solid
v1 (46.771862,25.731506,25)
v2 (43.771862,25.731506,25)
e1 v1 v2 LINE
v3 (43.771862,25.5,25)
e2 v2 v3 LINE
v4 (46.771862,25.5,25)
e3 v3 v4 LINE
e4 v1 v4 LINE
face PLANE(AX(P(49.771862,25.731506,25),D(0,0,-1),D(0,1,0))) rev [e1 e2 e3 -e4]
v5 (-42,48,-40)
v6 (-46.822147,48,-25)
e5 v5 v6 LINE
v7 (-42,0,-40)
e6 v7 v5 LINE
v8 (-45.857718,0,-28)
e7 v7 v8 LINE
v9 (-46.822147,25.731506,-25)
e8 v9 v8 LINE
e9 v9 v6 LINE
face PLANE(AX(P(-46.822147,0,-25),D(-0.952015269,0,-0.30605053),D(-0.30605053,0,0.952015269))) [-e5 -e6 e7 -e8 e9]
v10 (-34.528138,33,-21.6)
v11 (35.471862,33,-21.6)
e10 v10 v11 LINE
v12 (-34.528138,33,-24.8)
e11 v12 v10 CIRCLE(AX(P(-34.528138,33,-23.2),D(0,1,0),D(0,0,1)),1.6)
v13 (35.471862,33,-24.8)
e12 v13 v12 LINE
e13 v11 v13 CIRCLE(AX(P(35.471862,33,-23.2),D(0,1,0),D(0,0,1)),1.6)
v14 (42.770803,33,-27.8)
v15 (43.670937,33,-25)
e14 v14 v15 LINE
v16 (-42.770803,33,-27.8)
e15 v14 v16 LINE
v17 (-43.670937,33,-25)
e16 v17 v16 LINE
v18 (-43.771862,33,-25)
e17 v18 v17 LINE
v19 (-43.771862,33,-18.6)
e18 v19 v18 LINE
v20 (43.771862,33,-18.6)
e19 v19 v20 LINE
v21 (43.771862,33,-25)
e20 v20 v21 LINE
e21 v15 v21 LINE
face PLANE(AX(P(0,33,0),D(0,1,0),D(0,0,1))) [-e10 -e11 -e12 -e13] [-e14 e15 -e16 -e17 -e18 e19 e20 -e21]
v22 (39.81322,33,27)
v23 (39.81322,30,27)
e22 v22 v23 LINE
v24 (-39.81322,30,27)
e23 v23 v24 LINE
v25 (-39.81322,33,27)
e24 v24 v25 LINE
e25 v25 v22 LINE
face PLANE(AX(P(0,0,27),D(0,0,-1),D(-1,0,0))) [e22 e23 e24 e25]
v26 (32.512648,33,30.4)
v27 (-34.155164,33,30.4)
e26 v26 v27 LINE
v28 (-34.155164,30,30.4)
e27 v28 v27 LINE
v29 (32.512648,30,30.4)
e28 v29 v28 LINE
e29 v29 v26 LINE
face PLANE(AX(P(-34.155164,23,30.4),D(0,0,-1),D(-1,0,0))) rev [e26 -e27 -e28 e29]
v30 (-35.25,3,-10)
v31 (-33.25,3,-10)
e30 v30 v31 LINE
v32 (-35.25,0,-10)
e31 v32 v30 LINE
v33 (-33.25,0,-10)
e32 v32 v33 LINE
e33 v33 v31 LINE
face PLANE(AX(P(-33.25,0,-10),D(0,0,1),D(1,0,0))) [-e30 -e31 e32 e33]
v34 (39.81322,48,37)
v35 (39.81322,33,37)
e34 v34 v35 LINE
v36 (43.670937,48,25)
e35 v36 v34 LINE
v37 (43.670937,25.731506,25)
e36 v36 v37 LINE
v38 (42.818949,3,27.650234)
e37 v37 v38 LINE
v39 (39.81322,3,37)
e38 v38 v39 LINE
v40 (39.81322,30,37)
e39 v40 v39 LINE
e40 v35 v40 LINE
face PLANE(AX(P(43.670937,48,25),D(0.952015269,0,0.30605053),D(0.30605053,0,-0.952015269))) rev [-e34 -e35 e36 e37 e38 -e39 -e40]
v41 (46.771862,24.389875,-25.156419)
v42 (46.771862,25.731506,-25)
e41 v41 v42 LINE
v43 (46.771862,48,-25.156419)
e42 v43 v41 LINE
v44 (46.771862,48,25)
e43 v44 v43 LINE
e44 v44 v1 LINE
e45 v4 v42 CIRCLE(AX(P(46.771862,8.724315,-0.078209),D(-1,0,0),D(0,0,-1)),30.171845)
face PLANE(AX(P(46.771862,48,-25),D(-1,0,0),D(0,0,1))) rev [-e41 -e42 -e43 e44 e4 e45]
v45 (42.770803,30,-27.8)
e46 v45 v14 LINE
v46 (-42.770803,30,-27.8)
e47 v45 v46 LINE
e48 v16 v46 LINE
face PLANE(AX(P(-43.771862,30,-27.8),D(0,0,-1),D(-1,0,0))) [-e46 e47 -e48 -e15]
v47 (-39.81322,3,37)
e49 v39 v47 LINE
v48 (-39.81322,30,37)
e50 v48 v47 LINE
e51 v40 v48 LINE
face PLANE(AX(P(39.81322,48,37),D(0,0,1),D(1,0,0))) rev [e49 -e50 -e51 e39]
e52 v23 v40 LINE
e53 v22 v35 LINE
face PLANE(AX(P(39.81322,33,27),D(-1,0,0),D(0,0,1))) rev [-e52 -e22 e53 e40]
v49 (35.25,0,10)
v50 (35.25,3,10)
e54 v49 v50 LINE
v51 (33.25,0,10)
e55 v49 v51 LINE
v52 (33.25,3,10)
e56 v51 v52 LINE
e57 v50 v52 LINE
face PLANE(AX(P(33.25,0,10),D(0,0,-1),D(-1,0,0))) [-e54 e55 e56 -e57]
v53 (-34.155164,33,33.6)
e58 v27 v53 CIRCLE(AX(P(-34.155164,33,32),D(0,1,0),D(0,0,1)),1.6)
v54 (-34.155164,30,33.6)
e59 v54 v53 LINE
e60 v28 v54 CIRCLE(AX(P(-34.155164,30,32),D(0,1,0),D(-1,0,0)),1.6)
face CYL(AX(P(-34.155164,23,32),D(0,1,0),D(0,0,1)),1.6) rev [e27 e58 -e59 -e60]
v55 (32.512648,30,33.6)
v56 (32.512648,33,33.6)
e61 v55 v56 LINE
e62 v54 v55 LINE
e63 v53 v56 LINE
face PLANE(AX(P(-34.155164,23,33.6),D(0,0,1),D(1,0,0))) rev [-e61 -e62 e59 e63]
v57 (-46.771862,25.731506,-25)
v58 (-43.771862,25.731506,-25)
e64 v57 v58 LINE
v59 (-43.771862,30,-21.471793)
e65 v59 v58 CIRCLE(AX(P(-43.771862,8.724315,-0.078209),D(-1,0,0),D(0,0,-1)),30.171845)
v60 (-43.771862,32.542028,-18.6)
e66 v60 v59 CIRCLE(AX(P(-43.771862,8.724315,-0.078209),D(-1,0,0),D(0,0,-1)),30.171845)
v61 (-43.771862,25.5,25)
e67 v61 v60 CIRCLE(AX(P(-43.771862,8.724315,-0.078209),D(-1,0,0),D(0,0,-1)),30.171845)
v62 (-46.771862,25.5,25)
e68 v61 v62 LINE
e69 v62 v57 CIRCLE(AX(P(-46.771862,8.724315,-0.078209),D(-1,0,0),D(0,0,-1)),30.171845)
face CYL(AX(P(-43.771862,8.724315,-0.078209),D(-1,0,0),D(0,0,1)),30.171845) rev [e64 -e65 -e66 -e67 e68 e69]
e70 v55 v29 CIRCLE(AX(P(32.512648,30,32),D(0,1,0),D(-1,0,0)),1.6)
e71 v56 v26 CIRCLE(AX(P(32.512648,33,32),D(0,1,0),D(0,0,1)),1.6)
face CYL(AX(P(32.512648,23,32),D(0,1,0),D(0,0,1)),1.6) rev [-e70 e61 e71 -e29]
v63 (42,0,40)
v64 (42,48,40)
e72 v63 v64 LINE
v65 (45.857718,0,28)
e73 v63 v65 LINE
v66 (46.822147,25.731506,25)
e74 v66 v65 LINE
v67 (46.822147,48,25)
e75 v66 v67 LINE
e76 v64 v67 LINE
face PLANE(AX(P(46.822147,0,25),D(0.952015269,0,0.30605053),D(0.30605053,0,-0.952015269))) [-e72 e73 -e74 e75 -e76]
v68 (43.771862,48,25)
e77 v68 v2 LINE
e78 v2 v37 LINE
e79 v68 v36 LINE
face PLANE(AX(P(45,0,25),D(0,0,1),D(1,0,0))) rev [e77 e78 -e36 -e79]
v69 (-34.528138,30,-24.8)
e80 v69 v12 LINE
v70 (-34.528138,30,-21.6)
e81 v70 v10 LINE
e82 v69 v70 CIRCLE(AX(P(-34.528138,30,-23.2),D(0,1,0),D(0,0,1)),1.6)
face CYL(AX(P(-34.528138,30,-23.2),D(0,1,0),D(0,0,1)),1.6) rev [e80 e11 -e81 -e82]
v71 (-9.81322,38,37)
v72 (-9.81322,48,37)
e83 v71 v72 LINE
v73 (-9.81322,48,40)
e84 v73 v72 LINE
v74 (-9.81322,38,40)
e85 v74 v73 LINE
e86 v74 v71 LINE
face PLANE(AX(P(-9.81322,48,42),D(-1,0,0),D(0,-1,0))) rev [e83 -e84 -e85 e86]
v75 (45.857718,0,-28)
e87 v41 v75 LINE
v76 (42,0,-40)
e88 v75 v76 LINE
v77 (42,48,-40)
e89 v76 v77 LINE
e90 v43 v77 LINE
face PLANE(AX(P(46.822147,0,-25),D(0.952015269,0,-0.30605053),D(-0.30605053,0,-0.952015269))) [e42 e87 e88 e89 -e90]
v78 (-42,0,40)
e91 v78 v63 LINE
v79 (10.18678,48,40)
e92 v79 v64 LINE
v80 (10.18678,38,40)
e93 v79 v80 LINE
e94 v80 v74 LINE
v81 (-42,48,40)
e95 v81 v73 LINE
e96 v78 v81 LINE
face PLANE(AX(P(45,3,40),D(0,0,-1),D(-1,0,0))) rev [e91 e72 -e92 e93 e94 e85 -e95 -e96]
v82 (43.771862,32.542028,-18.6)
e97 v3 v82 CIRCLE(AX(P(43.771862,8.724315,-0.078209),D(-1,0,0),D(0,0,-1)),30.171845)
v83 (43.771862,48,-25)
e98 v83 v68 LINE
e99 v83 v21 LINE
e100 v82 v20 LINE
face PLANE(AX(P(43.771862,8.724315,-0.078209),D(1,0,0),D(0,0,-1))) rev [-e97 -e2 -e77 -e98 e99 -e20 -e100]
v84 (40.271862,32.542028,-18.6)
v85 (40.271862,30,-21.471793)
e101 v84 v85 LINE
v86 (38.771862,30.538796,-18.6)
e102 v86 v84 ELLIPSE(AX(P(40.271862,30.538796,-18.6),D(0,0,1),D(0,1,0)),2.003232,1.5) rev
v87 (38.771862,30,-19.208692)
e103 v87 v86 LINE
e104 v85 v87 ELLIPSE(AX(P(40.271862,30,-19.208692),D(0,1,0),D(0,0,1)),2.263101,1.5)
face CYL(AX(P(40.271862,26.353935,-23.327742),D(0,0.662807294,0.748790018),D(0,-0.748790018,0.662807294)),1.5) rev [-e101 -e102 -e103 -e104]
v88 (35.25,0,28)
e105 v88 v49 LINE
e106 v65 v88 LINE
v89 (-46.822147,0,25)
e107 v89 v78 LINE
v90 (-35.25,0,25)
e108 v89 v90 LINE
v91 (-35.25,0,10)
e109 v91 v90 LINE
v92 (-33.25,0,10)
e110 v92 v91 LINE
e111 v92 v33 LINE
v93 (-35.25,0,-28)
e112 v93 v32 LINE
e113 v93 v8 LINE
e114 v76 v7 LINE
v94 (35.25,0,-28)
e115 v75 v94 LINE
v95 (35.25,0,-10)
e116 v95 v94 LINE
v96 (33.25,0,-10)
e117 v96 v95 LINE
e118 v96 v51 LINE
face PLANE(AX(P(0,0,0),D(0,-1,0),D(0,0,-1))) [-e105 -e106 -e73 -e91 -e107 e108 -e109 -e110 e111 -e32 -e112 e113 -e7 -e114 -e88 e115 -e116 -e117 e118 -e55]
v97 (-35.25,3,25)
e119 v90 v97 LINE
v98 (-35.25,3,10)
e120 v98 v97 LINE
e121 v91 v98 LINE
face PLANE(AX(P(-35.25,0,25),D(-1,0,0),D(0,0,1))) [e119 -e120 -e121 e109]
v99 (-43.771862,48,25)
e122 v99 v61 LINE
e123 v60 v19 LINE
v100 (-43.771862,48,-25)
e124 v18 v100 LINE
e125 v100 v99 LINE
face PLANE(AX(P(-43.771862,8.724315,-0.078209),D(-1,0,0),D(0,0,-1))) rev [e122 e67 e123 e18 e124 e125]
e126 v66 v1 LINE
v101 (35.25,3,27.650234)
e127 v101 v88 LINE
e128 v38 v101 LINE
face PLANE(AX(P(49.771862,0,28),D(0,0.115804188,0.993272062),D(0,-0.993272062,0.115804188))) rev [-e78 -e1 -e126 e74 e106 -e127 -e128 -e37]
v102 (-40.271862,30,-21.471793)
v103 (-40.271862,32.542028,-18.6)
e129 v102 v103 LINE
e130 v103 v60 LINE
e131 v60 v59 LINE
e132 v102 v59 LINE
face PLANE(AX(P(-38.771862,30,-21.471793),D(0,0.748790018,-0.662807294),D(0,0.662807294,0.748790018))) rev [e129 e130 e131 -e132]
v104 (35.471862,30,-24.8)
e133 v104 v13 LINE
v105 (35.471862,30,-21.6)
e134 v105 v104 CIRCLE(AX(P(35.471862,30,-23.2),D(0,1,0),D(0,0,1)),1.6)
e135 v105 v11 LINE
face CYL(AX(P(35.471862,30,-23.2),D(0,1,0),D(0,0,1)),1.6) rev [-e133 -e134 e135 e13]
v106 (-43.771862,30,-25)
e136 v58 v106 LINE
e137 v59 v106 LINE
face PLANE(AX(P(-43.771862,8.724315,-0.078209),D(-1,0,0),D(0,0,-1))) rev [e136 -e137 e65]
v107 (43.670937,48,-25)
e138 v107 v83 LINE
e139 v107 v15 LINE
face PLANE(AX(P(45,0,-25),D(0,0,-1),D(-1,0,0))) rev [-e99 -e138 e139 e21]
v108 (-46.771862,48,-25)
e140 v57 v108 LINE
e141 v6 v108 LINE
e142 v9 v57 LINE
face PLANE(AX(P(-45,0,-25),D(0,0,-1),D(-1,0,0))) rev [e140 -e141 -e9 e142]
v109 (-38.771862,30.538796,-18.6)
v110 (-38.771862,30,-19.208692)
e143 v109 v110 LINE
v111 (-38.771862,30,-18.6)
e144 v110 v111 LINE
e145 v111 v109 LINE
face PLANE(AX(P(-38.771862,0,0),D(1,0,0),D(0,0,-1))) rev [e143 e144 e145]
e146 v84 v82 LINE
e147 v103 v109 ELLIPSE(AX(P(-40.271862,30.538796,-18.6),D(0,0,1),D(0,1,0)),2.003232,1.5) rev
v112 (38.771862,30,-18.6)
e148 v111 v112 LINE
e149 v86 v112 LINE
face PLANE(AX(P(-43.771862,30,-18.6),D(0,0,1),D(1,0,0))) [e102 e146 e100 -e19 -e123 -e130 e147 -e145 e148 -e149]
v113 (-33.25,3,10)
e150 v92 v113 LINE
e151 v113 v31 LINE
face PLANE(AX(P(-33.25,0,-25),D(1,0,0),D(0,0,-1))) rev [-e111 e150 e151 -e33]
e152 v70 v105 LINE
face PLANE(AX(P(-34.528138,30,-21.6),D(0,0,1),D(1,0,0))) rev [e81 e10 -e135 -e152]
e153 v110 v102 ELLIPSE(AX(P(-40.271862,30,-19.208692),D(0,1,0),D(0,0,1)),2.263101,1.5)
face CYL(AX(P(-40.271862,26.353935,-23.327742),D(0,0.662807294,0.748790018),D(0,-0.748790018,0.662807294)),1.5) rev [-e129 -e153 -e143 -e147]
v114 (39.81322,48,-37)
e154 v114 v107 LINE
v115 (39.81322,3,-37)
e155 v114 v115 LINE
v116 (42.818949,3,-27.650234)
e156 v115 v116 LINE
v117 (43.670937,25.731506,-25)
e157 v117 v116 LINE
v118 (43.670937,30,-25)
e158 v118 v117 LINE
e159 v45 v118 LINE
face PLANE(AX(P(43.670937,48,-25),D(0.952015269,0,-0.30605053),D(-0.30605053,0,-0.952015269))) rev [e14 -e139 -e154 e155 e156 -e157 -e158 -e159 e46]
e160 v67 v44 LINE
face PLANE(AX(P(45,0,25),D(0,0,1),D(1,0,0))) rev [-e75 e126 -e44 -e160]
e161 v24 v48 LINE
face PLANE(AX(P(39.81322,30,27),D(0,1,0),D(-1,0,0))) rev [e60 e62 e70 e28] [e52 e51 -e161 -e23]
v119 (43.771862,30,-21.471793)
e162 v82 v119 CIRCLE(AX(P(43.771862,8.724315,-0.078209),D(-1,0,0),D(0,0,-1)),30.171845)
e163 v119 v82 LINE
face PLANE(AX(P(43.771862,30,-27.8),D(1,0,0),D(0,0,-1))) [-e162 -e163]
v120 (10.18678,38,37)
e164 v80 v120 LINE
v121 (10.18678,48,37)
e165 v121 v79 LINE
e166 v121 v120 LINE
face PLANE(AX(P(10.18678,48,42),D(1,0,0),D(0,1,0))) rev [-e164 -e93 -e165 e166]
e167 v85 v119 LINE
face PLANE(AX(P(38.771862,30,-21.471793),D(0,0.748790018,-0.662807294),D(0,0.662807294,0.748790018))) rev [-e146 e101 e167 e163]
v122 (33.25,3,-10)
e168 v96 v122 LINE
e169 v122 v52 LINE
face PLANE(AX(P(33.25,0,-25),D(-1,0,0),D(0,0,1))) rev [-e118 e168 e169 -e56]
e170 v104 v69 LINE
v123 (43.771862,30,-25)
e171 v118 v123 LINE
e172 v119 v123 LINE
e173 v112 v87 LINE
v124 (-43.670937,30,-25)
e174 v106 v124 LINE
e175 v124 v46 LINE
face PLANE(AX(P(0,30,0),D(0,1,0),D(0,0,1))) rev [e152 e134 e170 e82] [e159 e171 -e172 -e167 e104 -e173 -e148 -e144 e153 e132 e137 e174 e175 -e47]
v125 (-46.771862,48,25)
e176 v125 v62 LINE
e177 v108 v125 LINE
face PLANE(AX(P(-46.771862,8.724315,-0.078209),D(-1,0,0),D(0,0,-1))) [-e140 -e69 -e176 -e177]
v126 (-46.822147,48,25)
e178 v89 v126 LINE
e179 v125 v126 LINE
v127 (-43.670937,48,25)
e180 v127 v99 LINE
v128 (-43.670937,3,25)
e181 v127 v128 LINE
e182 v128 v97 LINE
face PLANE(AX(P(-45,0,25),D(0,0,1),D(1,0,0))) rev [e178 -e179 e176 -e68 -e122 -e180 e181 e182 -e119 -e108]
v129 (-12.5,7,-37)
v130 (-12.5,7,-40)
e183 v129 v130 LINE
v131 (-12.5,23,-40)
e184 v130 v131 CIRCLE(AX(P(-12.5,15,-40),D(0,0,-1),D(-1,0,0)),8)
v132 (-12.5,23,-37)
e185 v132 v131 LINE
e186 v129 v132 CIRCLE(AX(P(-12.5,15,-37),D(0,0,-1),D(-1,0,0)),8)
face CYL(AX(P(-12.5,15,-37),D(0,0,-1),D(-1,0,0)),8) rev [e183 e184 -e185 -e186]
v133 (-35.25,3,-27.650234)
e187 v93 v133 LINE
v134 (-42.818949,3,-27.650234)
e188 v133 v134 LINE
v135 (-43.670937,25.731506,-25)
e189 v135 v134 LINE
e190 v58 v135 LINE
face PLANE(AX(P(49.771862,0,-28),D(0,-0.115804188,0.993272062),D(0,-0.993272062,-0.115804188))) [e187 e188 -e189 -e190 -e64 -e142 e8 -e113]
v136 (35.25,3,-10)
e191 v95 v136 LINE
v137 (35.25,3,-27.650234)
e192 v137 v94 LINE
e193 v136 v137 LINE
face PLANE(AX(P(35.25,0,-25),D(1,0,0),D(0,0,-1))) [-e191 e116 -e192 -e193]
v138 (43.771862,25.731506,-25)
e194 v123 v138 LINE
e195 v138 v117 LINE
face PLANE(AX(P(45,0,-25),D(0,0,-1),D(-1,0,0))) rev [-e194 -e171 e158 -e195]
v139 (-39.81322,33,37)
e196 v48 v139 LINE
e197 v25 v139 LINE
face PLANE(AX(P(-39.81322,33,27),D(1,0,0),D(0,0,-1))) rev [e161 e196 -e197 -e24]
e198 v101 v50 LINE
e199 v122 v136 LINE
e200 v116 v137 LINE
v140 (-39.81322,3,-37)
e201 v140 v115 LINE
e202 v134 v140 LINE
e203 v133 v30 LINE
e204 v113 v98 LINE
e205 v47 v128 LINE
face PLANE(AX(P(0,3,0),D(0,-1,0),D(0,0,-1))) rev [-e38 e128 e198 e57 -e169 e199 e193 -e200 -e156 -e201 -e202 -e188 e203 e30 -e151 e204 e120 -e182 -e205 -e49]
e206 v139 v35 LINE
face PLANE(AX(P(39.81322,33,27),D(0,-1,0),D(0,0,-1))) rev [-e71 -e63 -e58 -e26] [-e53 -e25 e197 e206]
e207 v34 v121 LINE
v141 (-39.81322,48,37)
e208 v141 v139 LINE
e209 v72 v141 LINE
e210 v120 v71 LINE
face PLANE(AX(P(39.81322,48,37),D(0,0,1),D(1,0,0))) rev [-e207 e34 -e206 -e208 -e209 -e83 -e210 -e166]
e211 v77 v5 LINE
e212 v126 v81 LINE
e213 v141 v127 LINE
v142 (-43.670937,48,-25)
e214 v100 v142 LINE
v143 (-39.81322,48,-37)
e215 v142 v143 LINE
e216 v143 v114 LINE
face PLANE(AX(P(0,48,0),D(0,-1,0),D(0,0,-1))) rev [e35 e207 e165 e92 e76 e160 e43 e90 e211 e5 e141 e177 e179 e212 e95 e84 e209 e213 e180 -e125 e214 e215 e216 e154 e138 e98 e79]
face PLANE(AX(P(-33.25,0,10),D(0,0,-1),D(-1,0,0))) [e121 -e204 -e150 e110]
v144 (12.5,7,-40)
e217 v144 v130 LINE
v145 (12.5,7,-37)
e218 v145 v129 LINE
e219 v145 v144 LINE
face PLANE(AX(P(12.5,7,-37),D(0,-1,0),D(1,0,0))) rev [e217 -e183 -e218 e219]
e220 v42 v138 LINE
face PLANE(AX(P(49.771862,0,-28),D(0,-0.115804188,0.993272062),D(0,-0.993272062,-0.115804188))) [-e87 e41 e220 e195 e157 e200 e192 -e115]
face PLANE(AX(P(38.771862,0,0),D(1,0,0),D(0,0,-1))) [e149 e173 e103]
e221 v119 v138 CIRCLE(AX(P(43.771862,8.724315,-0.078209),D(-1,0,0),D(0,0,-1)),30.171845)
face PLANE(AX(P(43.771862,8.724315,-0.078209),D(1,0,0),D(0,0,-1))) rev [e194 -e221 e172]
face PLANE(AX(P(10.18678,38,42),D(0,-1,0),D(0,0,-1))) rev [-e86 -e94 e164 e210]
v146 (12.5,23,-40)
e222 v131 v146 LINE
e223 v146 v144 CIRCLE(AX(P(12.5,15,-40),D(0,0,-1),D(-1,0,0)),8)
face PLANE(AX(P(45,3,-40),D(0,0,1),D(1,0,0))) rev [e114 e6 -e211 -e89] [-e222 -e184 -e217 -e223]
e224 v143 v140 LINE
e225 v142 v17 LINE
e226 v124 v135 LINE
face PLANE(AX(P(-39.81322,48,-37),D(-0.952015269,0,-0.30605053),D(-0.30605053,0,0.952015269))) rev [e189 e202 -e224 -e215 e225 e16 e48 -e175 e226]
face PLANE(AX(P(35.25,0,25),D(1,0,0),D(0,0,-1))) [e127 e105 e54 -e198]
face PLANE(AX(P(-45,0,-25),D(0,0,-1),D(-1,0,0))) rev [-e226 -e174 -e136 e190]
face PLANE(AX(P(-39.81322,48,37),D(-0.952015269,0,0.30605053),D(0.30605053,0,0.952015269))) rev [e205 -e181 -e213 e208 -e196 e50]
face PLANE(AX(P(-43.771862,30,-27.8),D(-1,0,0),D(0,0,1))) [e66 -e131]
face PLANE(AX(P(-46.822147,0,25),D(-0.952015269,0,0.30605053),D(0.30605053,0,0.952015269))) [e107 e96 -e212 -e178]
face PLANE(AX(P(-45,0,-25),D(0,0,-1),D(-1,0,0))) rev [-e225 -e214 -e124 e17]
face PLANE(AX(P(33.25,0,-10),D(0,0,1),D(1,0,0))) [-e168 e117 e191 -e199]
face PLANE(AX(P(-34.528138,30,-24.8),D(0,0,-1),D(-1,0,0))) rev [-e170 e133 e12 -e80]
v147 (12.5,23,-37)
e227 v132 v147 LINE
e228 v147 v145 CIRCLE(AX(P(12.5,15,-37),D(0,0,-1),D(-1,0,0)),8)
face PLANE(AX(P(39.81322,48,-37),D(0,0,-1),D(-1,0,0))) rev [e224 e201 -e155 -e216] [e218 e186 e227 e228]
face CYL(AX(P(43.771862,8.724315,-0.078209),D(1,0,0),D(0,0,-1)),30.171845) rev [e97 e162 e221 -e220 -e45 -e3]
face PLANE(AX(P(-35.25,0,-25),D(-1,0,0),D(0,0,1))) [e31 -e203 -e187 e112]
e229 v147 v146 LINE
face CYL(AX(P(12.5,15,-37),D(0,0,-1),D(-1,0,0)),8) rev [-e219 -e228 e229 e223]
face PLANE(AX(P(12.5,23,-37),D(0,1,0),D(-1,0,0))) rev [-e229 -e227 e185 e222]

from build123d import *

# Parameters (mm, degrees)
SKETCH1_W            = 90
SKETCH1_H            = 80
BOSS_EXTRUDE1_DEPTH  = 3
SKETCH2_W            = 11.75
SKETCH2_H            = 50
CUT_EXTRUDE1_DEPTH   = 3
SKETCH3_W            = 2
SKETCH3_H            = 15
BOSS_EXTRUDE2_DEPTH  = 3
BOSS_EXTRUDE3_DEPTH  = 3
CUT_EXTRUDE2_DEPTH   = 3
BOSS_EXTRUDE4_DEPTH  = 45
BOSS_EXTRUDE5_DEPTH  = 3
CUT_EXTRUDE3_DEPTH   = 3
CUT_EXTRUDE6_START   = -93.59401
CUT_EXTRUDE6_DEPTH   = 93.644295
MIRROR4_START        = 35.25
MIRROR4_DEPTH        = 11.572147393
SKETCH17_W           = 70.5
SKETCH17_H           = 3
BOSS_EXTRUDE10_DEPTH = 3
SKETCH19_W           = 79.626439034
SKETCH19_H           = 3
BOSS_EXTRUDE11_DEPTH = 10
CUT_EXTRUDE7_DEPTH   = 10
SKETCH22_W           = 87.543724768
SKETCH22_H           = 9.2
BOSS_EXTRUDE12_DEPTH = 3
CUT_EXTRUDE8_DEPTH   = 5
CUT_EXTRUDE9_DEPTH   = 5
FILLET4_R            = 1.5
FILLET6_R            = 1.5
SKETCH26_W           = 20
SKETCH26_H           = 10
CUT_EXTRUDE10_DEPTH  = 5


# Read off the part's stored shape, not the designer's step: Mirror4
with BuildPart() as part:
    # Sketch1 → Boss-Extrude1 (new body)
    with BuildSketch(Plane(origin=(0, 0, 0), x_dir=(1, 0, 0), z_dir=(0, 1, 0))):
        Rectangle(SKETCH1_W, SKETCH1_H)
    extrude(amount=BOSS_EXTRUDE1_DEPTH)

    # Sketch2 → Cut-Extrude1 (cut)
    with BuildSketch(Plane(origin=(0, 3, 0), x_dir=(1, 0, 0), z_dir=(0, 1, 0))):
        with Locations((-39.125, 0)):
            Rectangle(SKETCH2_W, SKETCH2_H)
        with Locations((39.125, 0)):
            Rectangle(SKETCH2_W, SKETCH2_H)
    extrude(amount=-CUT_EXTRUDE1_DEPTH, mode=Mode.SUBTRACT)

    # Sketch3 → Boss-Extrude2 (add)
    with BuildSketch(Plane(origin=(0, 3, 0), x_dir=(1, 0, 0), z_dir=(0, 1, 0))):
        with Locations((-34.25, -17.5)):
            Rectangle(SKETCH3_W, SKETCH3_H)
        with Locations((-34.25, 17.5)):
            Rectangle(SKETCH3_W, SKETCH3_H)
        with Locations((34.25, -17.5)):
            Rectangle(SKETCH3_W, SKETCH3_H)
        with Locations((34.25, 17.5)):
            Rectangle(SKETCH3_W, SKETCH3_H)
    extrude(amount=-BOSS_EXTRUDE2_DEPTH)

    # Sketch4 → Boss-Extrude3 (add)
    with BuildSketch(Plane(origin=(0, 3, 0), x_dir=(1, 0, 0), z_dir=(0, 1, 0))):
        Polygon((-45, 25), (-46.822147393, 25), (-45, 30.668057955), align=None)
        Polygon((45, 25), (46.822147393, 25), (45, 30.668057955), align=None)
        Polygon((-45, -25), (-46.822147393, -25), (-45, -30.668057955), align=None)
        Polygon((45, -25), (46.822147393, -25), (45, -30.668057955), align=None)
    extrude(amount=-BOSS_EXTRUDE3_DEPTH)

    # Sketch5 → Cut-Extrude2 (cut)
    with BuildSketch(Plane(origin=(0, 3, 0), x_dir=(1, 0, 0), z_dir=(0, 1, 0))):
        Polygon((-45, 30.668057955), (-42, 40), (-45, 40), align=None)
        Polygon((45, 30.668057955), (42, 40), (45, 40), align=None)
        Polygon((45, -40), (45, -30.668057955), (42, -40), align=None)
        Polygon((-45, -40), (-45, -30.668057955), (-42, -40), align=None)
    extrude(amount=-CUT_EXTRUDE2_DEPTH, mode=Mode.SUBTRACT)

    # Sketch6 → Boss-Extrude4 (add)
    with BuildSketch(Plane(origin=(0, 3, 0), x_dir=(1, 0, 0), z_dir=(0, 1, 0))):
        Polygon((39.813219517, 37), (-39.813219517, 37), (-43.670937432, 25), (-46.822147393, 25), (-42, 40), (42, 40), (46.771862384, 25.156418928), (46.771862384, 25), (43.670937432, 25), align=None)
        Polygon((43.670937432, -25), (39.813219517, -37), (-39.813219517, -37), (-43.670937432, -25), (-46.822147393, -25), (-42, -40), (42, -40), (46.822147393, -25), align=None)
    extrude(amount=BOSS_EXTRUDE4_DEPTH)

    # Sketch7 → Boss-Extrude5 (add)
    with BuildSketch(Plane(origin=(46.771862384, 0, 0), x_dir=(0, 0, -1), z_dir=(1, 0, 0))):
        with BuildLine():
            Line((-25, 25.5), (-25, 48))
            Line((-25, 48), (25.156418928, 48))
            Line((25.156418928, 48), (25.156418928, 25.5))
            ThreePointArc((25.156418928, 25.5), (0.078209464, 38.896159305), (-25, 25.5))
        make_face()
    boss_extrude5 = extrude(amount=-BOSS_EXTRUDE5_DEPTH)

    # Mirror1: Boss-Extrude5 across plane
    add(boss_extrude5.mirror(Plane.ZY))

    # Sketch10 → Cut-Extrude3 (cut)
    with BuildSketch(Plane(origin=(0, 0, -40), x_dir=(-1, 0, 0), z_dir=(0, 0, -1))):
        with BuildLine():
            Line((-12.5, 23), (12.5, 23))
            ThreePointArc((12.5, 23), (20.5, 15), (12.5, 7))
            Line((12.5, 7), (-12.5, 7))
            ThreePointArc((-12.5, 7), (-20.5, 15), (-12.5, 23))
        make_face()
    extrude(amount=-CUT_EXTRUDE3_DEPTH, mode=Mode.SUBTRACT)

    # Sketch15 → Cut-Extrude6 (cut)
    with BuildSketch(Plane(origin=(46.771862384, 0, 0), x_dir=(0, 0, -1), z_dir=(1, 0, 0)).offset(CUT_EXTRUDE6_START)):
        Polygon((25, 25.731506228), (25, 0), (28, 0), align=None)
    cut_extrude6 = extrude(amount=CUT_EXTRUDE6_DEPTH, mode=Mode.SUBTRACT)

    # Mirror3: Cut-Extrude6 across plane
    add(cut_extrude6.mirror(Plane.ZY), mode=Mode.SUBTRACT)

    # Mirror4 outline → Mirror4 (cut)
    with BuildSketch(Plane.YZ.offset(MIRROR4_START)):
        Polygon((25.731506228, 25), (0, 28), (0, 25), align=None)
    extrude(amount=MIRROR4_DEPTH, mode=Mode.SUBTRACT)

    # Sketch17 → Boss-Extrude10 (add)
    with BuildSketch(Plane(origin=(0, 0, -25), x_dir=(-1, 0, 0), z_dir=(0, 0, -1))):
        with Locations((0, 1.5)):
            Rectangle(SKETCH17_W, SKETCH17_H)
    extrude(amount=BOSS_EXTRUDE10_DEPTH)

    # Sketch19 → Boss-Extrude11 (add)
    with BuildSketch(Plane(origin=(0, 0, 37), x_dir=(-1, 0, 0), z_dir=(0, 0, -1))):
        with Locations((0, 31.5)):
            Rectangle(SKETCH19_W, SKETCH19_H)
    extrude(amount=BOSS_EXTRUDE11_DEPTH)

    # Sketch21 → Cut-Extrude7 (cut)
    with BuildSketch(Plane(origin=(0, 33, 0), x_dir=(1, 0, 0), z_dir=(0, 1, 0))):
        with BuildLine():
            Line((-34.155163783, -30.4), (32.512648359, -30.4))
            ThreePointArc((32.512648359, -30.4), (34.112648359, -32), (32.512648359, -33.6))
            Line((32.512648359, -33.6), (-34.155163783, -33.6))
            ThreePointArc((-34.155163783, -33.6), (-35.755163783, -32), (-34.155163783, -30.4))
        make_face()
    extrude(amount=-CUT_EXTRUDE7_DEPTH, mode=Mode.SUBTRACT)

    # Sketch22 → Boss-Extrude12 (add)
    with BuildSketch(Plane(origin=(0, 33, 0), x_dir=(1, 0, 0), z_dir=(0, 1, 0))):
        with Locations((0, 23.2)):
            Rectangle(SKETCH22_W, SKETCH22_H)
        with BuildLine():
            Line((-34.528137616, 24.8), (35.471862384, 24.8))
            ThreePointArc((35.471862384, 24.8), (37.071862384, 23.2), (35.471862384, 21.6))
            Line((35.471862384, 21.6), (-34.528137616, 21.6))
            ThreePointArc((-34.528137616, 21.6), (-36.128137616, 23.2), (-34.528137616, 24.8))
        make_face(mode=Mode.SUBTRACT)
    extrude(amount=-BOSS_EXTRUDE12_DEPTH)

    # Sketch24 → Cut-Extrude8 (cut)
    with BuildSketch(Plane.ZY.offset(43.771862384)):
        Polygon((-18.6, 32.542028326), (-18.6, 30), (-21.471793131, 30), align=None)
    extrude(amount=-CUT_EXTRUDE8_DEPTH, mode=Mode.SUBTRACT)

    # Sketch25 → Cut-Extrude9 (cut)
    with BuildSketch(Plane(origin=(43.771862384, 0, 0), x_dir=(0, 0, -1), z_dir=(1, 0, 0))):
        Polygon((18.6, 32.542028326), (18.6, 30), (21.471793131, 30), align=None)
    extrude(amount=-CUT_EXTRUDE9_DEPTH, mode=Mode.SUBTRACT)

    # Fillet4
    fillet4_edges = [part.edges().sort_by_distance(p)[0] for p in [
        (38.771862384, 31.271014163, -20.035896565),
    ]]
    fillet(fillet4_edges, radius=FILLET4_R)

    # Fillet6
    fillet6_edges = [part.edges().sort_by_distance(p)[0] for p in [
        (-38.771862384, 31.271014163, -20.035896565),
    ]]
    fillet(fillet6_edges, radius=FILLET6_R)

    # Sketch26 → Cut-Extrude10 (cut)
    with BuildSketch(Plane(origin=(0, 0, 37), x_dir=(-1, 0, 0), z_dir=(0, 0, -1))):
        with Locations((-0.186780483, 43)):
            Rectangle(SKETCH26_W, SKETCH26_H)
    extrude(amount=-CUT_EXTRUDE10_DEPTH, mode=Mode.SUBTRACT)


solid = part.part
